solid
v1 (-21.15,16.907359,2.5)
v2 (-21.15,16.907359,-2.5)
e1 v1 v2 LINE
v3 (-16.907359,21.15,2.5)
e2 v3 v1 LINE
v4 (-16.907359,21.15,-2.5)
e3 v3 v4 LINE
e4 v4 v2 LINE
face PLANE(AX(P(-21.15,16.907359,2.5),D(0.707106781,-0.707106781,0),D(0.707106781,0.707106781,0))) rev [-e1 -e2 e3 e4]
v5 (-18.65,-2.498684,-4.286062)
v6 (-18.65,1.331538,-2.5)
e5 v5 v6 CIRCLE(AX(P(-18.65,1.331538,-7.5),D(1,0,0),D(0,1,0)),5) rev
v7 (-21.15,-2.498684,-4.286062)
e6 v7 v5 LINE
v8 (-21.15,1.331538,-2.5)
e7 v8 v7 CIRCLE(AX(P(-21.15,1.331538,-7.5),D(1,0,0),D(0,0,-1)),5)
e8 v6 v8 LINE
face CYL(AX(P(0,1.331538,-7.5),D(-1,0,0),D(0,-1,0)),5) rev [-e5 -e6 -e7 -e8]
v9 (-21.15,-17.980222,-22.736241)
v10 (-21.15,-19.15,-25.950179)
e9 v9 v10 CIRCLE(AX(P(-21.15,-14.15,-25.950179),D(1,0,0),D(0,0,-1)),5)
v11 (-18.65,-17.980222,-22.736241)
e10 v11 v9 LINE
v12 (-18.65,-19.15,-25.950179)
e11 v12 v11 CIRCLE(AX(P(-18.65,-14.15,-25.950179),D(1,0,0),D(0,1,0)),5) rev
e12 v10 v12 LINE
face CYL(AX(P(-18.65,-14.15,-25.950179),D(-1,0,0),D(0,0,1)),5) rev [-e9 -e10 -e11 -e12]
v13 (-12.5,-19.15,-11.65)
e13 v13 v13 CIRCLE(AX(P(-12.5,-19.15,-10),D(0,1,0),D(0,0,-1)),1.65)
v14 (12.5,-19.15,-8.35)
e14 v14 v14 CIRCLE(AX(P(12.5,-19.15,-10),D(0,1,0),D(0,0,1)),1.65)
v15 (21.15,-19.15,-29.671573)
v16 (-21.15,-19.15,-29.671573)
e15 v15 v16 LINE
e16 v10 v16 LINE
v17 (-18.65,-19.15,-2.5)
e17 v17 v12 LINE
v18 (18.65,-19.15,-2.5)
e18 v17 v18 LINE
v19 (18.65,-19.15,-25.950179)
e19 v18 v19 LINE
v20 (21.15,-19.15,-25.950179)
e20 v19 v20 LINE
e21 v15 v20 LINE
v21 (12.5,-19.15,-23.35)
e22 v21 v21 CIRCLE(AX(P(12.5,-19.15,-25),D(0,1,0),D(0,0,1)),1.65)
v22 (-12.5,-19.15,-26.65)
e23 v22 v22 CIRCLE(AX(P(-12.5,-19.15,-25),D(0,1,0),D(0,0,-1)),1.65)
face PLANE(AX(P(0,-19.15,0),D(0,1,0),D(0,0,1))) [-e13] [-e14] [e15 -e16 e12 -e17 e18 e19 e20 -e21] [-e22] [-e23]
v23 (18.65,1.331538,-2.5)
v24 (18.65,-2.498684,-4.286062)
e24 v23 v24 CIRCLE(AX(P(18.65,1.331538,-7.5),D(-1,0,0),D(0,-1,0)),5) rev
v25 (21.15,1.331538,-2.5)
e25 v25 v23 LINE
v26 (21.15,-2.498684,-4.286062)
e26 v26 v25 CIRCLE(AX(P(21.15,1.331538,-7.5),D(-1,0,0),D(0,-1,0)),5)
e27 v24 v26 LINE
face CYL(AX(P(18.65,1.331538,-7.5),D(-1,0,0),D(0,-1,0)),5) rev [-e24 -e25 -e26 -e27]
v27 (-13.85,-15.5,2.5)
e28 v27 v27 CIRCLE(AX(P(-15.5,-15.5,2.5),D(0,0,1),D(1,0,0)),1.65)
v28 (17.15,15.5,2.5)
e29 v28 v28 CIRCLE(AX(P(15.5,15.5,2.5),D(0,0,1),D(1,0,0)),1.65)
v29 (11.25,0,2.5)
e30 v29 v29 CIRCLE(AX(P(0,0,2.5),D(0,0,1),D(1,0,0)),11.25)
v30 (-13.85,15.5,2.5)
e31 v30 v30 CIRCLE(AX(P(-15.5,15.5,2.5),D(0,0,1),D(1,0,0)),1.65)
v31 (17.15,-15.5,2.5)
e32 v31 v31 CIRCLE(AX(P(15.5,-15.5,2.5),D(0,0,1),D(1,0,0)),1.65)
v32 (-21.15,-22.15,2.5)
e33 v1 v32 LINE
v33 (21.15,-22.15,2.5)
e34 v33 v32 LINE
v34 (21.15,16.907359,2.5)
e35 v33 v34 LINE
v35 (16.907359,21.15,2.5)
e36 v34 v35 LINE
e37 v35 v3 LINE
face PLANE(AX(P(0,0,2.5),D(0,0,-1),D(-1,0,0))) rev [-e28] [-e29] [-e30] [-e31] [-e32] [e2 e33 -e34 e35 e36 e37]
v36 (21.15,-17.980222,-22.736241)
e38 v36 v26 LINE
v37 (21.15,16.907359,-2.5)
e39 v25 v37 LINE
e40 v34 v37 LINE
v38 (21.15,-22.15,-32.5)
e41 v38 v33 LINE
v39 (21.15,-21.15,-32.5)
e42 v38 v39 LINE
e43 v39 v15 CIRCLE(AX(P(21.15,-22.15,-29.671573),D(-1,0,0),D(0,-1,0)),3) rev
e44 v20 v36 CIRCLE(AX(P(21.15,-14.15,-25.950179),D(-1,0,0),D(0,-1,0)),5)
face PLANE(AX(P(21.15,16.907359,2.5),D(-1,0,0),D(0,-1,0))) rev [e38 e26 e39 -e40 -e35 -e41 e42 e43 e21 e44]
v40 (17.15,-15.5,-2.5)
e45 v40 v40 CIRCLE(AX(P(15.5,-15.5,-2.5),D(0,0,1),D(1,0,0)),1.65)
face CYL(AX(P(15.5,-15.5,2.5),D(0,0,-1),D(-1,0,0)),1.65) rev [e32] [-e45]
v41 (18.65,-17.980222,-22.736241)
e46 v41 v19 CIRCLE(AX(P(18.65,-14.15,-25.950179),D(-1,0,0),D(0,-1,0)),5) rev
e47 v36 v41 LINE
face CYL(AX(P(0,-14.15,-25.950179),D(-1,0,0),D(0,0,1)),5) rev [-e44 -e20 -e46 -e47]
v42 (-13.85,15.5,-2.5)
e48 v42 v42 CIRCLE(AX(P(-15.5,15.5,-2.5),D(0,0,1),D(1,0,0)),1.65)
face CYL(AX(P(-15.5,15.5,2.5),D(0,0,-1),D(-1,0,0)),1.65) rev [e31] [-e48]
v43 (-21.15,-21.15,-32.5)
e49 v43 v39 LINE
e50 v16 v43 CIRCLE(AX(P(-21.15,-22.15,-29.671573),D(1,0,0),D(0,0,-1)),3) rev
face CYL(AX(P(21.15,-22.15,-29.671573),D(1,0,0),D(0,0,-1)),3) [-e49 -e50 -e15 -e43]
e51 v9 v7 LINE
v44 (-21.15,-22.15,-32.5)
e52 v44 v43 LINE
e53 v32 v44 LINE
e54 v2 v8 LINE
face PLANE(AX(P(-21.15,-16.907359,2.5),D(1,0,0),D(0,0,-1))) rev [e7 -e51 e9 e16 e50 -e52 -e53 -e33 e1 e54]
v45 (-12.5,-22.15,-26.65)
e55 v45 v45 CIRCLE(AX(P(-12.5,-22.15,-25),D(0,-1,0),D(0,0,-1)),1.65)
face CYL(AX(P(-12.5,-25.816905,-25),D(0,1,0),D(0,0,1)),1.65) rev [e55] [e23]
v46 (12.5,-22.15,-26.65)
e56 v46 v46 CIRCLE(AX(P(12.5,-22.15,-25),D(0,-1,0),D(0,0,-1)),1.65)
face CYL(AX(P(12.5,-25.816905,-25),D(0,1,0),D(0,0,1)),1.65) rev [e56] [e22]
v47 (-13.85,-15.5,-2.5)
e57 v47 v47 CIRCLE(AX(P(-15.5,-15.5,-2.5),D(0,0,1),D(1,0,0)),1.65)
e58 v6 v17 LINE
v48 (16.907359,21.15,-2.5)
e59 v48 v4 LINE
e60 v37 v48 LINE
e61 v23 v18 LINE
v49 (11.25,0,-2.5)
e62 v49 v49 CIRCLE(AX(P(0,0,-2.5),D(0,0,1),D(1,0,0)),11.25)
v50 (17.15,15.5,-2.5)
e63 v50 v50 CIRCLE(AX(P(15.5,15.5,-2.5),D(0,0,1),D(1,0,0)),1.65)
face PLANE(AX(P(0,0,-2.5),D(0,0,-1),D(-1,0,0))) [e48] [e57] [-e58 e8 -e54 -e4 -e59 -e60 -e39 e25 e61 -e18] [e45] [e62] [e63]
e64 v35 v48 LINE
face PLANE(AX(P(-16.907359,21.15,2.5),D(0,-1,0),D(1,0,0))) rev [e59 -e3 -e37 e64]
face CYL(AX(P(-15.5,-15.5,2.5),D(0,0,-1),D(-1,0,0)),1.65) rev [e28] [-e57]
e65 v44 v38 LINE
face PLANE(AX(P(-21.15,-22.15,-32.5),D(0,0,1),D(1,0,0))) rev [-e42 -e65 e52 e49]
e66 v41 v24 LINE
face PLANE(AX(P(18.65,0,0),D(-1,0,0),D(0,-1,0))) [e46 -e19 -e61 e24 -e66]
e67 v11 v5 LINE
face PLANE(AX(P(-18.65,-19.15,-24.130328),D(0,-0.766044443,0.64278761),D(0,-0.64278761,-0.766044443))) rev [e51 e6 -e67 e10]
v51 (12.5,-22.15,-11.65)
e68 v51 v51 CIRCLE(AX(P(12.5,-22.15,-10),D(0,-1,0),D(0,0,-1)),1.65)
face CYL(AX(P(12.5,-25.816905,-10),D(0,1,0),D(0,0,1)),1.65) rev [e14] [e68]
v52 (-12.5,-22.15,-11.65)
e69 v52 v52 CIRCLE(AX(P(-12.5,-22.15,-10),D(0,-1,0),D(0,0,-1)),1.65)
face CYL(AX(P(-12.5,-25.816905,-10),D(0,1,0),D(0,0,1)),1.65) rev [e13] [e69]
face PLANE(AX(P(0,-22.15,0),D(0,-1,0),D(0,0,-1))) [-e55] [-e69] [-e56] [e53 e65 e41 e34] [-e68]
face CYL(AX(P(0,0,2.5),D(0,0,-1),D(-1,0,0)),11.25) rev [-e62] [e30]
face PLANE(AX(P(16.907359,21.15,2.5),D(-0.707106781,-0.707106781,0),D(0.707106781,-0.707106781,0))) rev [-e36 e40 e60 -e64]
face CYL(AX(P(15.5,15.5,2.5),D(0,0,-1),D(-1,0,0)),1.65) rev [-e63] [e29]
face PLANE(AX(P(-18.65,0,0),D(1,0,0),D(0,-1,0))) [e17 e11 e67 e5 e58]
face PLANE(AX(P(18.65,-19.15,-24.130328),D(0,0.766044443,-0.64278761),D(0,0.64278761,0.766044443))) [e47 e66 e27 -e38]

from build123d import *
from build123d.topology import SkipClean

# Parameters (mm, degrees)
SKETCH2_R           = 1.65
SKETCH2_R_2         = 11.25
BOSS_EXTRUDE2_DEPTH = 2.5
SKETCH7_W           = 42.3
SKETCH7_H           = 35
BOSS_EXTRUDE5_DEPTH = 2
BOSS_EXTRUDE6_DEPTH = 2.5
FILLET2_R           = 5
FILLET3_R           = 3
SKETCH11_R          = 1.65
CUT_EXTRUDE1_DEPTH  = 2
SKETCH12_W          = 42.3
SKETCH12_H          = 35
SKETCH12_R          = 1.65
BOSS_EXTRUDE7_DEPTH = 1


with BuildPart() as part:
    # Sketch2 → Boss-Extrude2 (new, symmetric)
    with BuildSketch(Plane.XY):
        Polygon((-21.15, 16.907359313), (-16.907359313, 21.15), (16.907359313, 21.15), (21.15, 16.907359313), (21.15, -16.907359313), (21.15, -21.15), (16.907359313, -21.15), (-16.907359313, -21.15), (-21.15, -21.15), (-21.15, -16.907359313), align=None)
        with Locations((-15.5, 15.5)):
            Circle(SKETCH2_R, mode=Mode.SUBTRACT)
        Circle(SKETCH2_R_2, mode=Mode.SUBTRACT)
        with Locations((15.5, 15.5)):
            Circle(SKETCH2_R, mode=Mode.SUBTRACT)
        with Locations((15.5, -15.5)):
            Circle(SKETCH2_R, mode=Mode.SUBTRACT)
        with Locations((-15.5, -15.5)):
            Circle(SKETCH2_R, mode=Mode.SUBTRACT)
    extrude(amount=BOSS_EXTRUDE2_DEPTH, both=True)

    # Sketch7 → Boss-Extrude5 (add)
    with BuildSketch(Plane.XZ.offset(21.15)):
        with Locations((0, -15)):
            Rectangle(SKETCH7_W, SKETCH7_H)
    extrude(amount=-BOSS_EXTRUDE5_DEPTH)

    # Sketch10 → Boss-Extrude6 (add)
    with BuildSketch(Plane(origin=(21.15, 0, 0), x_dir=(0, 0, -1), z_dir=(1, 0, 0))):
        Polygon((24.130327706, -19.15), (2.5, -1), (2.5, -19.15), align=None)
    boss_extrude6 = extrude(amount=-BOSS_EXTRUDE6_DEPTH)

    # Mirror2: Boss-Extrude6 across plane
    add(boss_extrude6.mirror(Plane(origin=(0, 0, 0), x_dir=(0, 0, 1), z_dir=(1, 0, 0))))

    # Fillet2
    fillet2_edges = [part.edges().sort_by_distance(p)[0] for p in [
        (19.9, -19.15, -24.130327706),
        (19.9, -1, -2.5),
        (-19.9, -19.15, -24.130327706),
        (-19.9, -1, -2.5),
    ]]
    fillet(fillet2_edges, radius=FILLET2_R)

    # Fillet3
    # the kernel refuses this fillet: 3 mm, written as the material it takes off along each edge
    with BuildSketch(Plane(origin=(-28.221067812, -19.15, -32.5), x_dir=(0, -1, 0), z_dir=(1, 0, 0))) as fillet3_piece_1:
        with BuildLine():
            CenterArc((3, -2.828427125), FILLET3_R, 109.471220634, 70.528779366)
            Line((0, -2.828427125), (-0.06, -2.828427125))
            Line((-0.06, -2.828427125), (-0.06, 0))
            Line((-0.06, 0), (0, 0.06))
            ThreePointArc((0, 0.06), (1, 0.06), (1.98, 0.056568542))
            Line((1.98, 0.056568542), (2, 0))
        make_face()
    extrude(amount=56.442135624, mode=Mode.SUBTRACT)

    # Sketch11 → Cut-Extrude1 (cut)
    with BuildSketch(Plane(origin=(0, -19.15, 0), x_dir=(1, 0, 0), z_dir=(0, 1, 0))):
        with Locations(Location((12.5, 10, 0), (0, 0, 270))):
            Circle(SKETCH11_R)
        with Locations(Location((12.5, 25, 0), (0, 0, 270))):
            Circle(SKETCH11_R)
        with Locations(Location((-12.5, 25, 0), (0, 0, 270))):
            Circle(SKETCH11_R)
        with Locations(Location((-12.5, 10, 0), (0, 0, 270))):
            Circle(SKETCH11_R)
    extrude(amount=-CUT_EXTRUDE1_DEPTH, mode=Mode.SUBTRACT)

    # Sketch12 → Boss-Extrude7 (add)
    with SkipClean():  # the faces are left unmerged after this step: merging them gives an invalid solid
        with BuildSketch(Plane.XZ.offset(21.15)):
            with Locations((0, -15)):
                Rectangle(SKETCH12_W, SKETCH12_H)
            with Locations(Location((-12.5, -25, 0), (0, 0, 270))):
                Circle(SKETCH12_R, mode=Mode.SUBTRACT)
            with Locations(Location((-12.5, -10, 0), (0, 0, 270))):
                Circle(SKETCH12_R, mode=Mode.SUBTRACT)
            with Locations(Location((12.5, -10, 0), (0, 0, 90))):
                Circle(SKETCH12_R, mode=Mode.SUBTRACT)
            with Locations(Location((12.5, -25, 0), (0, 0, 90))):
                Circle(SKETCH12_R, mode=Mode.SUBTRACT)
        extrude(amount=BOSS_EXTRUDE7_DEPTH)
    add(part.part.scale(1), mode=Mode.REPLACE)  # the faces are merged on a copy


solid = part.part
